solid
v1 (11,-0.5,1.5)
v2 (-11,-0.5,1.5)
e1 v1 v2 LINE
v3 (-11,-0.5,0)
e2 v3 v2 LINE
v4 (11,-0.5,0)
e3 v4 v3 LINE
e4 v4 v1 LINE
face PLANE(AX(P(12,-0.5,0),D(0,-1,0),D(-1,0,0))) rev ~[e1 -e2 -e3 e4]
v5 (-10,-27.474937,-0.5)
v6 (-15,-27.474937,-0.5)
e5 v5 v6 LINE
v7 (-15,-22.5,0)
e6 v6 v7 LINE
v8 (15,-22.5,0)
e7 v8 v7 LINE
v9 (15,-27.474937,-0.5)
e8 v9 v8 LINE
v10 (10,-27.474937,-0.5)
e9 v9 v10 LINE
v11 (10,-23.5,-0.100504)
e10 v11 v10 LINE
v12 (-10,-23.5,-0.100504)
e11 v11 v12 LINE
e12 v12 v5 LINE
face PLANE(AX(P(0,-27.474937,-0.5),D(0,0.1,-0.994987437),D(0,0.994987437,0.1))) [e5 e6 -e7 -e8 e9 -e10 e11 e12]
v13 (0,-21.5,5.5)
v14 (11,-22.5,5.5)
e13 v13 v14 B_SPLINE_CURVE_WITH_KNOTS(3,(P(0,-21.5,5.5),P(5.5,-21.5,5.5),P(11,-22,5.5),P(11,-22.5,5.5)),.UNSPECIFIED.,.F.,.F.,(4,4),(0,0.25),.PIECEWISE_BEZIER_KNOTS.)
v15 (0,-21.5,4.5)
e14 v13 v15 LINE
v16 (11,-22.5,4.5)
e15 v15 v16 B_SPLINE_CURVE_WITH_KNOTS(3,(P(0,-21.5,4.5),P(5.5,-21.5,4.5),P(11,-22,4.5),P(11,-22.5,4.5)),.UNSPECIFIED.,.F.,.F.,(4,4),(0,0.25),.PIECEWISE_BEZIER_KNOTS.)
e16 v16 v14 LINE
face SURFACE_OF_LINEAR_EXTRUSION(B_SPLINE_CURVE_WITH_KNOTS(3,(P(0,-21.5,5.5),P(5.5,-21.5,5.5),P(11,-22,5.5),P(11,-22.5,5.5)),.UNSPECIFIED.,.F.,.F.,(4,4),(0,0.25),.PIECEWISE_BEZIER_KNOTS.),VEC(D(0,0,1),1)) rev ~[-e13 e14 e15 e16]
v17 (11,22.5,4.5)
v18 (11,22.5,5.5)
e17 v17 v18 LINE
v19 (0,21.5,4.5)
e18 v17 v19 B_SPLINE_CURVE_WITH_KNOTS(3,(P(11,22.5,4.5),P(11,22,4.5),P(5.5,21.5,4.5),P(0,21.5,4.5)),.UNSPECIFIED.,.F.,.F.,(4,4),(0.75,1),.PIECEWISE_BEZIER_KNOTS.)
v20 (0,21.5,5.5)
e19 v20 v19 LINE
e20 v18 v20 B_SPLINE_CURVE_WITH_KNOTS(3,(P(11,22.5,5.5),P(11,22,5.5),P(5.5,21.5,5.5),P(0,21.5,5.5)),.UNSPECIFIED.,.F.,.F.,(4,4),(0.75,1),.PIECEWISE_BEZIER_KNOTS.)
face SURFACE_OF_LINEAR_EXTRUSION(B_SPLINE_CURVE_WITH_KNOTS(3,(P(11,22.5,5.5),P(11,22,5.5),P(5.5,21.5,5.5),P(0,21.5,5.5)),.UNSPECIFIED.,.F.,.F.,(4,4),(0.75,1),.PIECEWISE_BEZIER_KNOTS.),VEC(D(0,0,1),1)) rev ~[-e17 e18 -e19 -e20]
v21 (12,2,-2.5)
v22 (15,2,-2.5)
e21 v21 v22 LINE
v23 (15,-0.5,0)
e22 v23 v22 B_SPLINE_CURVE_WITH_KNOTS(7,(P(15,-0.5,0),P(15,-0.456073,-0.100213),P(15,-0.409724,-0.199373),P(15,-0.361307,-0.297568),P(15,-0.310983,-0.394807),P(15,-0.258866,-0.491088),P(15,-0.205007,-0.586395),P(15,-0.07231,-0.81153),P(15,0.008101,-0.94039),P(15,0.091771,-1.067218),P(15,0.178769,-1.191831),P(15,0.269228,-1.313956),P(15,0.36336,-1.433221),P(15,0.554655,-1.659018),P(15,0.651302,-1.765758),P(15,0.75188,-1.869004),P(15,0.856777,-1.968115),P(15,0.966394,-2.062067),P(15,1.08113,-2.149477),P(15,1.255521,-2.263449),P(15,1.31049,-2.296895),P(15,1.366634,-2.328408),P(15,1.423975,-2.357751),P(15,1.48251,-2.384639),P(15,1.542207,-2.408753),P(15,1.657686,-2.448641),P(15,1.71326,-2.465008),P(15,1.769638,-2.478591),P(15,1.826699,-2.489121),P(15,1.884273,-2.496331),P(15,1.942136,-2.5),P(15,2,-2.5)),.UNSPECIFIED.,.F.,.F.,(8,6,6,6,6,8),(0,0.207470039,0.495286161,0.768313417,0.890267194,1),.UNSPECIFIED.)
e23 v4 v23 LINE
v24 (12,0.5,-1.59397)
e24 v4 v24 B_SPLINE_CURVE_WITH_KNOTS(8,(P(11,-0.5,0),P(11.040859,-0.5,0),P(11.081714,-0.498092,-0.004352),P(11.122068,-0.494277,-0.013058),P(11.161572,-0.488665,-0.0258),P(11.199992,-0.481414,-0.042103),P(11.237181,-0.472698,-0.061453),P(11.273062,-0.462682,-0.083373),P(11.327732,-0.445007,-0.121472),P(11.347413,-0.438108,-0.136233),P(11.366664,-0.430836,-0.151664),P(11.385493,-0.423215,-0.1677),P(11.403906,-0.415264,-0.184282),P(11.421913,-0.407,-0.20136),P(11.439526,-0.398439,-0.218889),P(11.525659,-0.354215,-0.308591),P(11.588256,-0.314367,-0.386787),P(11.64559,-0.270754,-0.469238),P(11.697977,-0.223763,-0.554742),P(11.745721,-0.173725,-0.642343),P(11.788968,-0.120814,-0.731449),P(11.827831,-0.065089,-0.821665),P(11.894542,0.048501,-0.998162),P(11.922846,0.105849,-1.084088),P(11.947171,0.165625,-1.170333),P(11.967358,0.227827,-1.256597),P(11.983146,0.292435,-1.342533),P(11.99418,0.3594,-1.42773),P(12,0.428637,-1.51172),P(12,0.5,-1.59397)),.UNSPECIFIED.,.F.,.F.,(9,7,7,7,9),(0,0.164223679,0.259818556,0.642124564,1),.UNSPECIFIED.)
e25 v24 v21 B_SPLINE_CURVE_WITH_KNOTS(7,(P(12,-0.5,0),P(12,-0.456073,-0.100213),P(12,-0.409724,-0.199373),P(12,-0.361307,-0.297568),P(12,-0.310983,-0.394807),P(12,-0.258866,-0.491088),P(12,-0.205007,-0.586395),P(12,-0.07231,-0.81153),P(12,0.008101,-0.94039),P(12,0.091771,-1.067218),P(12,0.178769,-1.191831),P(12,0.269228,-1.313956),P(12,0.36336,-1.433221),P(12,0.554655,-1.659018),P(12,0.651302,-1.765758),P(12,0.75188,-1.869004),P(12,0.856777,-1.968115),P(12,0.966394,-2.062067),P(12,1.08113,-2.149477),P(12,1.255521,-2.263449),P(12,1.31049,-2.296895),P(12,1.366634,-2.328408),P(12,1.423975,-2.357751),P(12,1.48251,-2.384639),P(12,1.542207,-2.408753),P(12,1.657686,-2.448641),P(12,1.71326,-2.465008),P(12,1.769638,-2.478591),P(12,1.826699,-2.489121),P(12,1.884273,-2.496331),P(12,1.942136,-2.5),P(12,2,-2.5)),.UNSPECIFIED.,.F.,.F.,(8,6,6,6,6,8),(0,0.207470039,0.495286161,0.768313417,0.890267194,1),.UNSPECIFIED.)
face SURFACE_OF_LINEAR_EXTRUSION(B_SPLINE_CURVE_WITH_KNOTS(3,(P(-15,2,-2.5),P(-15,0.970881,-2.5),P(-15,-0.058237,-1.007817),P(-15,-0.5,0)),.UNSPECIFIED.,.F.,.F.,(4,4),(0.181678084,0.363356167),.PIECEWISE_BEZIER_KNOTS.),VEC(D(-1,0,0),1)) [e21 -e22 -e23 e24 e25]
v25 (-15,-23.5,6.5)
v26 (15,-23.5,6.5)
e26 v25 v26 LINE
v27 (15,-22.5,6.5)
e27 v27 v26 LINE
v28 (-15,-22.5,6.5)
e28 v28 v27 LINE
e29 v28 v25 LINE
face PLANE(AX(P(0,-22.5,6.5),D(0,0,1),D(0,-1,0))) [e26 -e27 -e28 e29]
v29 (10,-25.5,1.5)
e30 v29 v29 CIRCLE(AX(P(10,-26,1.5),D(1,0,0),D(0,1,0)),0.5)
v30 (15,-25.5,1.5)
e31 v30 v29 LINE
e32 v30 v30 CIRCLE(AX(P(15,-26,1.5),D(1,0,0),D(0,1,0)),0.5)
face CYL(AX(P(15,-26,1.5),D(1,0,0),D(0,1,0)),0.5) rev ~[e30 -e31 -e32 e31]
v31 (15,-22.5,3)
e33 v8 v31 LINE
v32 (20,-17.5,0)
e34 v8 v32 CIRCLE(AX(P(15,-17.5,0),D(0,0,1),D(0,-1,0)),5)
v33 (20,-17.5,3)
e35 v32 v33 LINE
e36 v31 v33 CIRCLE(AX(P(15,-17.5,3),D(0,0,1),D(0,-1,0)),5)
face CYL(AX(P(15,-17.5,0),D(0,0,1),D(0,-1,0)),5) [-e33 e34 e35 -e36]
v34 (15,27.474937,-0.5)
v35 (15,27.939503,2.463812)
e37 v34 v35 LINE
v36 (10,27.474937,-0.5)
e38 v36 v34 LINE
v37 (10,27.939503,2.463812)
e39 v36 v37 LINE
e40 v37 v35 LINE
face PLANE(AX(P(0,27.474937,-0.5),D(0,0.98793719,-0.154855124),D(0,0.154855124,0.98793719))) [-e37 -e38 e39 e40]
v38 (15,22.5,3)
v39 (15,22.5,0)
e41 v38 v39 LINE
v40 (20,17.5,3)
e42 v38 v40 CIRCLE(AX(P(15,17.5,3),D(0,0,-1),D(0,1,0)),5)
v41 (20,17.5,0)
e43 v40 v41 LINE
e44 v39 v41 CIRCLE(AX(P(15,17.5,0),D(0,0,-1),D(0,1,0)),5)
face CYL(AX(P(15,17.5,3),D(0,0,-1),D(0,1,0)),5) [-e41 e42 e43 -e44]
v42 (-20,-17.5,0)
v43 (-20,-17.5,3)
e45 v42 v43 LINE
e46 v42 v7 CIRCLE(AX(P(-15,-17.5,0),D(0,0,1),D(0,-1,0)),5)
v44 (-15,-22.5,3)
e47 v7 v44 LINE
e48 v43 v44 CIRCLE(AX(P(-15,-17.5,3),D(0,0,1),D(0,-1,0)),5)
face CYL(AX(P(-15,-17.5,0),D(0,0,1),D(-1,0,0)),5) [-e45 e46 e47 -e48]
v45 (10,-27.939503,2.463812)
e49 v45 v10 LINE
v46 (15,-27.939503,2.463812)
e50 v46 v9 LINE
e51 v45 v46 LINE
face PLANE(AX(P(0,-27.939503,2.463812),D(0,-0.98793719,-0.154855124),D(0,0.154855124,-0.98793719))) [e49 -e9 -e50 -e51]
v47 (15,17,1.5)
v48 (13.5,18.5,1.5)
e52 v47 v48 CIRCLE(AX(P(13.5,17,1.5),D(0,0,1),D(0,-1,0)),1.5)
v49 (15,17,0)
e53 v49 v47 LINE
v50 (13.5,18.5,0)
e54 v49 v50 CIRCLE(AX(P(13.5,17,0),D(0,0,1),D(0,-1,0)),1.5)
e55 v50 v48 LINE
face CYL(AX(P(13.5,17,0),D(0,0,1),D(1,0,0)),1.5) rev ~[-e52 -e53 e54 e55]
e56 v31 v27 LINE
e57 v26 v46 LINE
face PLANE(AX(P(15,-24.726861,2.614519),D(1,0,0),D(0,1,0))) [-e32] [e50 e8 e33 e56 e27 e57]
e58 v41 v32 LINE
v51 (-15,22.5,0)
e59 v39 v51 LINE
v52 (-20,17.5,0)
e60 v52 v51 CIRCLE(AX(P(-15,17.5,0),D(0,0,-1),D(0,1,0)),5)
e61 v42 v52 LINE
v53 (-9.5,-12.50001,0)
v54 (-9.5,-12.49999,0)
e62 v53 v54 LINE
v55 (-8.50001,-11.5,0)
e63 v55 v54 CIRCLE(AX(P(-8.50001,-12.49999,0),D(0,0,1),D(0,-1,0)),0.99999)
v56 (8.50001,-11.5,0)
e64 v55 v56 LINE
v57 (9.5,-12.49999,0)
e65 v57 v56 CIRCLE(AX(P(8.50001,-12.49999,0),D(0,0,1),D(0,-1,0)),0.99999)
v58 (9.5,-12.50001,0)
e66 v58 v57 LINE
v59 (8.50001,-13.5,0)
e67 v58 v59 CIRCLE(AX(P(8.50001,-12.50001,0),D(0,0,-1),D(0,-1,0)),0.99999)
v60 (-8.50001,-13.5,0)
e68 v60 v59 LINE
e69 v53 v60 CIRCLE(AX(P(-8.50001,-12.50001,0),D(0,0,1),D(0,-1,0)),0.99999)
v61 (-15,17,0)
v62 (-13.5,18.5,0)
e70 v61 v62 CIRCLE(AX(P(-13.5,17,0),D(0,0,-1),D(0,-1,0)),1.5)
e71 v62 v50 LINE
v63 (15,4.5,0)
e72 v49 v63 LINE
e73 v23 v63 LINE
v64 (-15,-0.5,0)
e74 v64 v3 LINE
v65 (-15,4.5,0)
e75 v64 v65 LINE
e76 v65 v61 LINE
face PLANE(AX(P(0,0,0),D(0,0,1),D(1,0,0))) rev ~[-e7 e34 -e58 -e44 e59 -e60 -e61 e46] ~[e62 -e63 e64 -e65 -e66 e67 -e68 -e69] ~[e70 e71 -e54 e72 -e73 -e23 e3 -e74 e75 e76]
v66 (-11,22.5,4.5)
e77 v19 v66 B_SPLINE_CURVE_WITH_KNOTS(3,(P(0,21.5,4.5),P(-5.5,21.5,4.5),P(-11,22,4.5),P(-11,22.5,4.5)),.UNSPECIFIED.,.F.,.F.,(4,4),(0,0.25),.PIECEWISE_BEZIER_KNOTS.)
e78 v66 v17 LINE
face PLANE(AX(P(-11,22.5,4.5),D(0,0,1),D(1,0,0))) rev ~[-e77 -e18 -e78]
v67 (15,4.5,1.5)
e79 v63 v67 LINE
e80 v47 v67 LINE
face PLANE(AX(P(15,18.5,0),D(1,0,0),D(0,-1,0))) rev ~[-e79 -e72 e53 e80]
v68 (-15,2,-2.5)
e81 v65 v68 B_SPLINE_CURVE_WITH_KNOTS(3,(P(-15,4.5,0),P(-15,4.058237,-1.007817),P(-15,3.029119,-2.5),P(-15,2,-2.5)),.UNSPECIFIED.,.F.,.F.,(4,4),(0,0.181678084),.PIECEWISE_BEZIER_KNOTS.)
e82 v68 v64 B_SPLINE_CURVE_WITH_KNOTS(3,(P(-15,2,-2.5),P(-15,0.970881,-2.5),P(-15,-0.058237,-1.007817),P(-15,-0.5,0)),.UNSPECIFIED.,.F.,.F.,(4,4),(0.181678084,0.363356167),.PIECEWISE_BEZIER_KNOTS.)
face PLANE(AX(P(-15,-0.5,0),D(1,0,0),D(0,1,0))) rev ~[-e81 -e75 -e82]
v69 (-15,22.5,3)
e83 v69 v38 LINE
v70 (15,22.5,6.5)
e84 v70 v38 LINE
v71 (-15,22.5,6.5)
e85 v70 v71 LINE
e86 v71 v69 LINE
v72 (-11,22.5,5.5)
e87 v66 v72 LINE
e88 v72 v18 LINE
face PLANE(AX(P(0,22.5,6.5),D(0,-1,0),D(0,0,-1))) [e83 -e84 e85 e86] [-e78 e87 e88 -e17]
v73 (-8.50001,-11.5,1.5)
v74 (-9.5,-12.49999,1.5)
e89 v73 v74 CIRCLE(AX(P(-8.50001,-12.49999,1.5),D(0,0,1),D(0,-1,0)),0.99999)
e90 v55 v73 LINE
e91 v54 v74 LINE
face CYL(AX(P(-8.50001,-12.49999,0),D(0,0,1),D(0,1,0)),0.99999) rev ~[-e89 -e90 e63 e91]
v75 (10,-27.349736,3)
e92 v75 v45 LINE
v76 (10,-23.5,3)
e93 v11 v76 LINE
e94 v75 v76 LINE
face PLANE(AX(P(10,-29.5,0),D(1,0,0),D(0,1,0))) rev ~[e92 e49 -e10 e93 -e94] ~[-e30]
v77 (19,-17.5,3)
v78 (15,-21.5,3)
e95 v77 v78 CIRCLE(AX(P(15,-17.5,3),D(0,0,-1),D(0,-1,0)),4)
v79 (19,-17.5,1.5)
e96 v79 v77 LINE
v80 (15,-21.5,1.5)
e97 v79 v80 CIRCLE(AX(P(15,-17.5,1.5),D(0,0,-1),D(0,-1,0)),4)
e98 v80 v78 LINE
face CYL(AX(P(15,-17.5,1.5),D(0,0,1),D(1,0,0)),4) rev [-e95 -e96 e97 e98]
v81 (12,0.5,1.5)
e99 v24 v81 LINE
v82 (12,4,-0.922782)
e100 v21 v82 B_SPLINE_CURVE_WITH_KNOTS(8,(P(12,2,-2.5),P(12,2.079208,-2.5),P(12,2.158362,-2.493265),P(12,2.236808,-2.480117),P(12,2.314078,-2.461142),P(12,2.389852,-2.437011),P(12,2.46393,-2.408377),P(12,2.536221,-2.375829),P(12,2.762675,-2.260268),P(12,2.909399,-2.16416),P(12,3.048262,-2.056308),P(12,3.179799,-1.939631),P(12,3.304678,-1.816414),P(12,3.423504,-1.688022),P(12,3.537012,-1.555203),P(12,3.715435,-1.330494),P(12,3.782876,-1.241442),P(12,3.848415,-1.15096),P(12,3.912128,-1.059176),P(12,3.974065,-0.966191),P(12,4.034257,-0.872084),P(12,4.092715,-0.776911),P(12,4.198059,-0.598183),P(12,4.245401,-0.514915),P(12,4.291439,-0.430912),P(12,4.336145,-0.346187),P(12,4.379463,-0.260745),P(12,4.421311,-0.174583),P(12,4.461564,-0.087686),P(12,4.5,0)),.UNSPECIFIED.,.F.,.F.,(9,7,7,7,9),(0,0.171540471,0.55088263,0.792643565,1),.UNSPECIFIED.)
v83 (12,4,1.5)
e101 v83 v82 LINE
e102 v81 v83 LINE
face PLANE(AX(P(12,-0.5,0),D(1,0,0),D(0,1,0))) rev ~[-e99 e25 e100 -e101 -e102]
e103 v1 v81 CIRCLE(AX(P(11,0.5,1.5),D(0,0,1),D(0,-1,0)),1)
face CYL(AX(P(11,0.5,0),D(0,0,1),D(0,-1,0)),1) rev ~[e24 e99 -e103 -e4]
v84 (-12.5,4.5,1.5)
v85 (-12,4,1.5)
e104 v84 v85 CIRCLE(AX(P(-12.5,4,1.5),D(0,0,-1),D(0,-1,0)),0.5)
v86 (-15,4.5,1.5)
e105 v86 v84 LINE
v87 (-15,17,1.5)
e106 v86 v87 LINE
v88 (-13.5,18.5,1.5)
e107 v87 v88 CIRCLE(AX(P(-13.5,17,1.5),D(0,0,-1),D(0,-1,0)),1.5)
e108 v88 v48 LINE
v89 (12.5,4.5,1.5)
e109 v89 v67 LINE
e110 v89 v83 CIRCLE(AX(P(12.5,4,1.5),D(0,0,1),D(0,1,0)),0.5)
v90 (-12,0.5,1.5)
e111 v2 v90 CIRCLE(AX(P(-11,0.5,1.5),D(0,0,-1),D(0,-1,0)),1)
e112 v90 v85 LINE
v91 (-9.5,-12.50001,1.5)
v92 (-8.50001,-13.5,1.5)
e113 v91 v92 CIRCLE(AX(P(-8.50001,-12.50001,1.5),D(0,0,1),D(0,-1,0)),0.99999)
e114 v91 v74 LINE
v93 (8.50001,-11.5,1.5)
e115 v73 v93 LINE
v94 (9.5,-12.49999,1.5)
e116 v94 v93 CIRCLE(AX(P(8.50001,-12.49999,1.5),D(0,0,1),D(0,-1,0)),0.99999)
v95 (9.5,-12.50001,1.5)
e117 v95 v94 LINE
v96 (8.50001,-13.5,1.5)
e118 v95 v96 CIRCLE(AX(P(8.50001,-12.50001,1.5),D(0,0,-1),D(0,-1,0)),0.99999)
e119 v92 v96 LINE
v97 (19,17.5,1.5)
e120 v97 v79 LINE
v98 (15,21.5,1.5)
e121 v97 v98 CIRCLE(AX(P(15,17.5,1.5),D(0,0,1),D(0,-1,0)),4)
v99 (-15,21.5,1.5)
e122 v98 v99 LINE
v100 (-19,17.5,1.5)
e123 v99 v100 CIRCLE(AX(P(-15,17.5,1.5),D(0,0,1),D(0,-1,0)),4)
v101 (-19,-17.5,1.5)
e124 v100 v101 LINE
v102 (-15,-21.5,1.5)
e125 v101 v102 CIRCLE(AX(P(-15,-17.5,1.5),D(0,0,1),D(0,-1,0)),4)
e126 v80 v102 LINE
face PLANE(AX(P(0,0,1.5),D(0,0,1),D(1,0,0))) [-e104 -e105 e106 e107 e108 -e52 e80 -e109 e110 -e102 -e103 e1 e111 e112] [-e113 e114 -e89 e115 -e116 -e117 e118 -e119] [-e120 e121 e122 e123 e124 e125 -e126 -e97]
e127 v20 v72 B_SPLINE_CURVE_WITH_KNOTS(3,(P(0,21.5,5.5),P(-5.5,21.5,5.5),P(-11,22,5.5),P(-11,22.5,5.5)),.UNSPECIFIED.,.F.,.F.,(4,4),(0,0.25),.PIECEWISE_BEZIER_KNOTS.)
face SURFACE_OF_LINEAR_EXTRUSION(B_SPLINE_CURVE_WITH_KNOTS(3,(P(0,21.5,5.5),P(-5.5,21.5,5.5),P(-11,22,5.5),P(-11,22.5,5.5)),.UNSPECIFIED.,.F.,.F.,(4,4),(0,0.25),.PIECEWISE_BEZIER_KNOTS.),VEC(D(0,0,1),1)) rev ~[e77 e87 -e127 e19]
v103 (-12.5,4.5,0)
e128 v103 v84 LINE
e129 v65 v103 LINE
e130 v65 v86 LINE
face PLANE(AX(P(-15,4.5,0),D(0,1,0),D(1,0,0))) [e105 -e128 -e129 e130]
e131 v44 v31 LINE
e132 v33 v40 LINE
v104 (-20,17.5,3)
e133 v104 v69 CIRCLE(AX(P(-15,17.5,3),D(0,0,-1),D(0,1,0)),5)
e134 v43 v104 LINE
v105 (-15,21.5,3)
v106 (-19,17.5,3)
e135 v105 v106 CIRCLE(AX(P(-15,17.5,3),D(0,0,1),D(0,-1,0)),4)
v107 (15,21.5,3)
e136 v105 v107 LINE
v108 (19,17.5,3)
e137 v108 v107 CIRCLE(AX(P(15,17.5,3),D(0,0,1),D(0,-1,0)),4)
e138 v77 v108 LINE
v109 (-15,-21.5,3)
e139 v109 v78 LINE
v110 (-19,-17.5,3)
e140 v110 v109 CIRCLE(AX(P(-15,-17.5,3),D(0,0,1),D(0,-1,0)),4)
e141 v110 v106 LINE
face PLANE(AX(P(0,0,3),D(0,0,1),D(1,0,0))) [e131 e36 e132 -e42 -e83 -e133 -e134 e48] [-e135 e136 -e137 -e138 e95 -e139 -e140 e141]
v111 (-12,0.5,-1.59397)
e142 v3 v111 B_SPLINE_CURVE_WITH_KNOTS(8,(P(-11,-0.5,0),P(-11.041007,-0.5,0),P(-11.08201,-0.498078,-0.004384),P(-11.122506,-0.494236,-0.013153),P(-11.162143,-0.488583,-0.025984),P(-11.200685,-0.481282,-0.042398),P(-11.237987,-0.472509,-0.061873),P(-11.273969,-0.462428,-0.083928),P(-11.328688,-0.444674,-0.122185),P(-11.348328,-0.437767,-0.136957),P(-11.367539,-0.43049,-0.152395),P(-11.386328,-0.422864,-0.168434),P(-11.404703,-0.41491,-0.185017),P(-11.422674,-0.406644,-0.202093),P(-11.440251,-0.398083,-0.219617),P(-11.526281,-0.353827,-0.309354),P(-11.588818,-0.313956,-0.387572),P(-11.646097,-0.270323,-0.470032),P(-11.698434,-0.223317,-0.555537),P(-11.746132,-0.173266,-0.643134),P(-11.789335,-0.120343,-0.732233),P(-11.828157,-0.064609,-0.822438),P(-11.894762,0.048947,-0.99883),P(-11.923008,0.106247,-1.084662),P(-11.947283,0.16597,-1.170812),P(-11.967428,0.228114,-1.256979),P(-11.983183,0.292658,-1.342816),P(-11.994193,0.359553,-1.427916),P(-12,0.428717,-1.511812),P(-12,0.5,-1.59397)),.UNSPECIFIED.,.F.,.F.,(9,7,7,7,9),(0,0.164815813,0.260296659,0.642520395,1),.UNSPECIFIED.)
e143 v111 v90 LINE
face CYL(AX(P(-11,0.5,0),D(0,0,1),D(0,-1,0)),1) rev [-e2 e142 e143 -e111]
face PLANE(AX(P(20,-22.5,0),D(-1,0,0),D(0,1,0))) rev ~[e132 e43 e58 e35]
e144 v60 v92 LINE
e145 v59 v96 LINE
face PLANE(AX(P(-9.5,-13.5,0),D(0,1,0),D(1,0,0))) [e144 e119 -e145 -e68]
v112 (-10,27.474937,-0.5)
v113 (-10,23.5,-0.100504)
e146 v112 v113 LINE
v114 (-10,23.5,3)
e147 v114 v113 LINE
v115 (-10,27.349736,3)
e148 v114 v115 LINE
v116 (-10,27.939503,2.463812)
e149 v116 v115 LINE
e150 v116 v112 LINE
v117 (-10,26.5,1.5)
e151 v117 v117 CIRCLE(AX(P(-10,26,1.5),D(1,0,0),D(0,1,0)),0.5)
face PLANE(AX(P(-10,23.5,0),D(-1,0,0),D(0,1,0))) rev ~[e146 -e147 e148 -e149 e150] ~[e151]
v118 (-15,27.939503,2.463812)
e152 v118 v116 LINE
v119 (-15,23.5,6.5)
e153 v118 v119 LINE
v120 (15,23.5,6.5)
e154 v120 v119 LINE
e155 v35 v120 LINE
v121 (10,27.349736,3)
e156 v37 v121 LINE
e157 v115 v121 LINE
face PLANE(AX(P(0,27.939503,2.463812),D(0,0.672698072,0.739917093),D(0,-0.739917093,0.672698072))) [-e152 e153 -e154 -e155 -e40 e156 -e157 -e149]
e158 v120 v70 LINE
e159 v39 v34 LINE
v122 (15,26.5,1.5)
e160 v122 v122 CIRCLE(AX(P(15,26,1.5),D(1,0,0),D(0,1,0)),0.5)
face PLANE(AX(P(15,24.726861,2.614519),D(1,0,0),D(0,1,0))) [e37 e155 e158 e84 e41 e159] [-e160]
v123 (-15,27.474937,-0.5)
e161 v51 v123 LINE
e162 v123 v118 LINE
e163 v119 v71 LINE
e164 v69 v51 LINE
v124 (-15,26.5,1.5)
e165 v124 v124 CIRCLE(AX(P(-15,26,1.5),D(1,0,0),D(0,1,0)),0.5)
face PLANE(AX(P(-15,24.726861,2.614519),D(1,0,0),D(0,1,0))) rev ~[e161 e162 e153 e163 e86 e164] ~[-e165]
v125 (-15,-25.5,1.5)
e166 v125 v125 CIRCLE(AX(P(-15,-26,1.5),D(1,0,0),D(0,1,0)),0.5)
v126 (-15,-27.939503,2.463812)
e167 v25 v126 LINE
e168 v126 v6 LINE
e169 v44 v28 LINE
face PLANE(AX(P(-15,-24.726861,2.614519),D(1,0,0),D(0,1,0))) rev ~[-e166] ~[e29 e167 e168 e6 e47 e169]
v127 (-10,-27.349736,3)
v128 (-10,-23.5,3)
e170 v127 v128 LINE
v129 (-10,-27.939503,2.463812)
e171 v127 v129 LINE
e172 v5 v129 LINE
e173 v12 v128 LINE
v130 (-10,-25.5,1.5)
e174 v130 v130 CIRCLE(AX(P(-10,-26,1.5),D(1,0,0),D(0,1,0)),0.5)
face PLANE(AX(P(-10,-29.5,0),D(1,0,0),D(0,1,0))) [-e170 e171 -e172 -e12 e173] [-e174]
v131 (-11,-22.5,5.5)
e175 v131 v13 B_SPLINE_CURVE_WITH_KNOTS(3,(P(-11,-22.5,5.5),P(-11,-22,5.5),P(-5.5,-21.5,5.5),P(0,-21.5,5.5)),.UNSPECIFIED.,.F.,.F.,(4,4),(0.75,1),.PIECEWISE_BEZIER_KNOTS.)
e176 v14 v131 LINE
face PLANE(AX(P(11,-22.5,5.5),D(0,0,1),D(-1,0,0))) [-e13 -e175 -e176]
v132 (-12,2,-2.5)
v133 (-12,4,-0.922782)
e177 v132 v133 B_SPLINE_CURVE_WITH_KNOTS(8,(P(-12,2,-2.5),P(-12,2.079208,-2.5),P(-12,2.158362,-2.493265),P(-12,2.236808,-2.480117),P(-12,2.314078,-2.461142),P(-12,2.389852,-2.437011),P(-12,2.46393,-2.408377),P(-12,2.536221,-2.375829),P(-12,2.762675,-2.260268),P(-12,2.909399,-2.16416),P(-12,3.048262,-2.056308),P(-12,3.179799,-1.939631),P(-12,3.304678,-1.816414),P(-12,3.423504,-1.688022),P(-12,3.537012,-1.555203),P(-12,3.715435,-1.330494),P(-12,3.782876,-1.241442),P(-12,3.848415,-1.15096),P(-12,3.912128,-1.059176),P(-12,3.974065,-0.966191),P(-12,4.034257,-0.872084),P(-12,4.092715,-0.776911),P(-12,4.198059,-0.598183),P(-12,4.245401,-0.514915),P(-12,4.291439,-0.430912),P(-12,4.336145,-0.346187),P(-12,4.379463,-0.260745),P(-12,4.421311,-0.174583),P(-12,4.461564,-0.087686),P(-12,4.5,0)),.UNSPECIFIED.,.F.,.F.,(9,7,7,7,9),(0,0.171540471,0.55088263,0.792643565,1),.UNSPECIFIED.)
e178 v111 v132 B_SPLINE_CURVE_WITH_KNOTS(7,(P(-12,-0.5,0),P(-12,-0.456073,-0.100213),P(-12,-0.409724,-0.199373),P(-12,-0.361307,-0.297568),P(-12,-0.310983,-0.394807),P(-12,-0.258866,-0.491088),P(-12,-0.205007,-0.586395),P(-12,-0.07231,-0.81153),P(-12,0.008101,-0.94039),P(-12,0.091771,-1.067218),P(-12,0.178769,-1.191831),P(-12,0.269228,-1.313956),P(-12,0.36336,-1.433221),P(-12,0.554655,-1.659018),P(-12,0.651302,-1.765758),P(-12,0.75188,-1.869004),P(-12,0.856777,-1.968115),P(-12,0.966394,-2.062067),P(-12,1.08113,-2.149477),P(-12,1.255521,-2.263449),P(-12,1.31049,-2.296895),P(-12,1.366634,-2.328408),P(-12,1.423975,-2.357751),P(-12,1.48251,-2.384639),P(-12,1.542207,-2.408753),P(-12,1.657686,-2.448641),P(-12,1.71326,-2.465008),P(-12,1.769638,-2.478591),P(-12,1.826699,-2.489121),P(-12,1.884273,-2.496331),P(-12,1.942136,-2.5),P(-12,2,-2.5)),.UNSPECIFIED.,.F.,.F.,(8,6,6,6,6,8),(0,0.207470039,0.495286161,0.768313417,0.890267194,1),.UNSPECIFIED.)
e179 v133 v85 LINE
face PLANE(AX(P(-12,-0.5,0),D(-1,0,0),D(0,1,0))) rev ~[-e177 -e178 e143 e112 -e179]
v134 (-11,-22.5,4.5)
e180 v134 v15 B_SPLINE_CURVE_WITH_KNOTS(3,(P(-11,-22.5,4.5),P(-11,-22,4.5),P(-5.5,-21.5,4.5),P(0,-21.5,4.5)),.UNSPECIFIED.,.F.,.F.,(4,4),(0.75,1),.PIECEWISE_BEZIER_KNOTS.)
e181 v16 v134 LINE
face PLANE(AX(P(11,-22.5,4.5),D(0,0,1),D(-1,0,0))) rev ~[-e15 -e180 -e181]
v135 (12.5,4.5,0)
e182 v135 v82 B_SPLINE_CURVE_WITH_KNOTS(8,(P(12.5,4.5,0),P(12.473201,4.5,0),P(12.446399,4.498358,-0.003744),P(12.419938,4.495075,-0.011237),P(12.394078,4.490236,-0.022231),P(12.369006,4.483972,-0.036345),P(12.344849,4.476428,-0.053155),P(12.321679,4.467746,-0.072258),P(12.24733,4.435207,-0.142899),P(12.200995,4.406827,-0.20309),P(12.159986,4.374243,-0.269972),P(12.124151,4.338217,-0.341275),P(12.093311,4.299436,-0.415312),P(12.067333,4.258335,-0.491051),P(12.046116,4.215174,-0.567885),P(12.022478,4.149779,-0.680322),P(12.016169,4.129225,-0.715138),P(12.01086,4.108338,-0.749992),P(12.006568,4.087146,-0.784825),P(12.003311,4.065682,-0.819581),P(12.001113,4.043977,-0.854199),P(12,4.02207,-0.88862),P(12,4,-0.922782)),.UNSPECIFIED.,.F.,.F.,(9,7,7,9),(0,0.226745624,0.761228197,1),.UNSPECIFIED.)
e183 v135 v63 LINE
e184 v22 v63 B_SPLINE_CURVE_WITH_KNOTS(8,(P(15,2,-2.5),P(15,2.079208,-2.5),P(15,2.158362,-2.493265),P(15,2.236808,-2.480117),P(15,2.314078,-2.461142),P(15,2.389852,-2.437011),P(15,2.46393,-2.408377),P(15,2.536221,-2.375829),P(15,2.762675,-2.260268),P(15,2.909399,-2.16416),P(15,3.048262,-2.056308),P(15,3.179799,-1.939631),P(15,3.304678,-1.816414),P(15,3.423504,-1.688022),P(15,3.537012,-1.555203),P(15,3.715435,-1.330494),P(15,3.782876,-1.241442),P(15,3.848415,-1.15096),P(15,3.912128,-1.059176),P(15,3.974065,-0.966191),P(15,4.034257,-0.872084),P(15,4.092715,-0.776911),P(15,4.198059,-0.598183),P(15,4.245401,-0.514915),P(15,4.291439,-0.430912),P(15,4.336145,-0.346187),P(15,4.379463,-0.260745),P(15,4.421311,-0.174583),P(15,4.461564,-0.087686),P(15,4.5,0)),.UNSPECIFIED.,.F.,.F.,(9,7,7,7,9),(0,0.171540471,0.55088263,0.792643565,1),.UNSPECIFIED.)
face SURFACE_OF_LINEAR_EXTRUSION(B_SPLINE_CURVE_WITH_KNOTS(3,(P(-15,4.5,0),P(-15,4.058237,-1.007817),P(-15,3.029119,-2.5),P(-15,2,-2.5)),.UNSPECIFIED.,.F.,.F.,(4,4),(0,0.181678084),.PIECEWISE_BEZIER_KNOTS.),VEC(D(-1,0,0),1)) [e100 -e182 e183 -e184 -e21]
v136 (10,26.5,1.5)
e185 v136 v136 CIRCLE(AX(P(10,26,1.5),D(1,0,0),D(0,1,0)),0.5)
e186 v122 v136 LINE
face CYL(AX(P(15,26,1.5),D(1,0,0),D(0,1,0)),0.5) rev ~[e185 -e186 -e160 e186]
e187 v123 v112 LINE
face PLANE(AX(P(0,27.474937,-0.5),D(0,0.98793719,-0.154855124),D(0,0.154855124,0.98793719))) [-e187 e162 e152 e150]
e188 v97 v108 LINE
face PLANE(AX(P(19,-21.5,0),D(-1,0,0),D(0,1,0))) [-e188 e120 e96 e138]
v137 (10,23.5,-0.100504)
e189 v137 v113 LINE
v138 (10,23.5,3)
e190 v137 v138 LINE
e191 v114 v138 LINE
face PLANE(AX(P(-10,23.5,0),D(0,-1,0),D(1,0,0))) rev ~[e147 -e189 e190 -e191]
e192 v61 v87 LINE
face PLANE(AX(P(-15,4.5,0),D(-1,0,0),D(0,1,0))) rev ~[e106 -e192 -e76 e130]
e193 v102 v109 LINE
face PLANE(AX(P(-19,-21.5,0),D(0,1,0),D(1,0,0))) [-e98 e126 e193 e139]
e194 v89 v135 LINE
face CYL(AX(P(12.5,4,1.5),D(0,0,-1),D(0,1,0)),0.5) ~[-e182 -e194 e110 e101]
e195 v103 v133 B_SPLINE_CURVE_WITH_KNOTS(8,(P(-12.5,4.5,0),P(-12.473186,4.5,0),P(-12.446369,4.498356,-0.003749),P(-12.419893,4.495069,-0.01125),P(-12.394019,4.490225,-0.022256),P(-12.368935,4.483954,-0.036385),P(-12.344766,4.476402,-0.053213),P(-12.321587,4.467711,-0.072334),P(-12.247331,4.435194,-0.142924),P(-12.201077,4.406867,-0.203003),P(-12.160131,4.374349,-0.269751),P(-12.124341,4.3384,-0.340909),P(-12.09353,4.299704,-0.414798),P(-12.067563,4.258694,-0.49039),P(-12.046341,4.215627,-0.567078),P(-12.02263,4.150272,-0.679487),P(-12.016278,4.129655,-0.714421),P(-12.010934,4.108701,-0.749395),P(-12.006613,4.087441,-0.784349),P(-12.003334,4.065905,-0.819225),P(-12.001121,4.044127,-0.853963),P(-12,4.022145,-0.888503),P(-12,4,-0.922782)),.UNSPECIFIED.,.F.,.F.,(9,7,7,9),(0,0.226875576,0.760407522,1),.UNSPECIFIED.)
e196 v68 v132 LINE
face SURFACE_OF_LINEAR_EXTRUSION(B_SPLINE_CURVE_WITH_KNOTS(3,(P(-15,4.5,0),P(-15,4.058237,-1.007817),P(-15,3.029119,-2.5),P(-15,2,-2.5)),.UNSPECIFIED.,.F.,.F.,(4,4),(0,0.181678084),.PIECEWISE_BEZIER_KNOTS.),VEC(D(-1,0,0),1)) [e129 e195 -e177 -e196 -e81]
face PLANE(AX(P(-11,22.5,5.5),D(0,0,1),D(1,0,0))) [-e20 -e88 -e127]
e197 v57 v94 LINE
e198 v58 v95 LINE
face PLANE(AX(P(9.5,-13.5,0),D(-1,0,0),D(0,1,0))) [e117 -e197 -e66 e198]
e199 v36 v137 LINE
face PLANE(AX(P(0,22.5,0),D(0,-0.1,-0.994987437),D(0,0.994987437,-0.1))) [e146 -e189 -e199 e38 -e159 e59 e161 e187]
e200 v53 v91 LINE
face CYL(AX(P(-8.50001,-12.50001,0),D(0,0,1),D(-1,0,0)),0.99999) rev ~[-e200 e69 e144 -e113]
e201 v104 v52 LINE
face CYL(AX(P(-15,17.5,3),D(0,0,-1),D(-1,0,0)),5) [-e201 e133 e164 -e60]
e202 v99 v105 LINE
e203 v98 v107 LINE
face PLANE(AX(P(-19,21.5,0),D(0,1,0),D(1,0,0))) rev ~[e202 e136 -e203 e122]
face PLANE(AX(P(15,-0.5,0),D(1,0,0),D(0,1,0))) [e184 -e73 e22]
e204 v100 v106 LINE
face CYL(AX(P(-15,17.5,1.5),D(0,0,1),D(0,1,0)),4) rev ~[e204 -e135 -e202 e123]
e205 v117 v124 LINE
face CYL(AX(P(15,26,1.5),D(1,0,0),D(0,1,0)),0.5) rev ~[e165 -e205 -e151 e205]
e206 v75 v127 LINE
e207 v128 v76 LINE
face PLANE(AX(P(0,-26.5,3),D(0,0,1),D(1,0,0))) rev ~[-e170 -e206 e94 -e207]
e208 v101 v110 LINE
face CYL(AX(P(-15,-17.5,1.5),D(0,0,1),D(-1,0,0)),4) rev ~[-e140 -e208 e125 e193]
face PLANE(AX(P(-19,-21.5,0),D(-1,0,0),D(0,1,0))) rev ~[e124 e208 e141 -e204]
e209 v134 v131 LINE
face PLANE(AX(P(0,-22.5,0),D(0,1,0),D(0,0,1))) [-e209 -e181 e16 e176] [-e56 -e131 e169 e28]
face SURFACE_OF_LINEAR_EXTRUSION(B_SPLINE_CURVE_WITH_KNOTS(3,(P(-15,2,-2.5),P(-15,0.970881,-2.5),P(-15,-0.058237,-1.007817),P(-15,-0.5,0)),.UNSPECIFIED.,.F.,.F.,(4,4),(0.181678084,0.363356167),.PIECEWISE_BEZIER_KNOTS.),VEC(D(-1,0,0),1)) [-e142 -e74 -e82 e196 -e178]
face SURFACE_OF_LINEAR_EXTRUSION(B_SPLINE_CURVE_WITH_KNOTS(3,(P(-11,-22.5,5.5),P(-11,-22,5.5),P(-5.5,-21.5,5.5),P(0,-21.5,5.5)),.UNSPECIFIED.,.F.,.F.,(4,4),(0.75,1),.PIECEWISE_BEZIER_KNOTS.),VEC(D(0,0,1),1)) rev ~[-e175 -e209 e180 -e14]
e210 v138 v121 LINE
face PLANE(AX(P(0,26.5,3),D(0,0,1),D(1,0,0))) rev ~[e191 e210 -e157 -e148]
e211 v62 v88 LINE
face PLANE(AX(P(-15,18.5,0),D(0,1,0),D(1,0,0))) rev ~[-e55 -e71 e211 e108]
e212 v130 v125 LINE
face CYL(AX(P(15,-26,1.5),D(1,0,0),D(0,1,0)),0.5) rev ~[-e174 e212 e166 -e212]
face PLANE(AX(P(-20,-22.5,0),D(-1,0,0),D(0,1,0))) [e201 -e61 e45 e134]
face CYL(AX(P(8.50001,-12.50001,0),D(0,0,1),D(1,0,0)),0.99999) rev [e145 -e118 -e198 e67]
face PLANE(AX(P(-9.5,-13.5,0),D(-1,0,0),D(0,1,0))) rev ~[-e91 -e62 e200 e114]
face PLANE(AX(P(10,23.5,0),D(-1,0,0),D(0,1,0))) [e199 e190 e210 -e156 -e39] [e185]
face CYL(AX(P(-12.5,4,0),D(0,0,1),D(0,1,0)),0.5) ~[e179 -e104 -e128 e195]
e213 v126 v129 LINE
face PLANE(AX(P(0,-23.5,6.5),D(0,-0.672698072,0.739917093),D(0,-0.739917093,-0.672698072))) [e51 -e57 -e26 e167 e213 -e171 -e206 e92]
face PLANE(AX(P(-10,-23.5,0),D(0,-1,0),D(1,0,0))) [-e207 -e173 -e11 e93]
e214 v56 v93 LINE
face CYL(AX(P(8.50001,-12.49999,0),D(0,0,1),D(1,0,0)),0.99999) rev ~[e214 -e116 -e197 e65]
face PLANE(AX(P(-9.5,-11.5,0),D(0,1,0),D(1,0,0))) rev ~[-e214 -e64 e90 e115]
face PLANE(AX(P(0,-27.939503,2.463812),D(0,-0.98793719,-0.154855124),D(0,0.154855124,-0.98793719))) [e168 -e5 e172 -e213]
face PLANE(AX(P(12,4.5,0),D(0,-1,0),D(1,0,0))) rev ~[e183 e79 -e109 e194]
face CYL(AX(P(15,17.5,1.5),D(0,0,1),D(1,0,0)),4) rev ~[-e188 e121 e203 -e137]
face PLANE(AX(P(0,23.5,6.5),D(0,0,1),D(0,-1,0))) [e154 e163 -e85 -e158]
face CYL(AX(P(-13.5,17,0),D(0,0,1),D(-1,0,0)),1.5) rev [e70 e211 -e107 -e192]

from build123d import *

# Parameters (mm, degrees)
F0_W           = 40
F0_H           = 45
F0_W_2         = 19
F0_H_2         = 2
F0_W_3         = 3
F0_H_3         = 5
F1_DEPTH       = 1.5
F2_DEPTH       = 2.5
F4_DEPTH       = 50
F5_R           = 0.99999
F6_R           = 1.5
F7_R           = 1
F8_R           = 0.5
F9_W           = 40
F9_H           = 45
F9_W_2         = 38
F9_H_2         = 43
F10_DEPTH      = 3
F11_R          = 4
F12_R          = 5
F14_DEPTH      = 15
F14_DEPTH_BACK = 15
F15_W          = 22
F15_H          = 1
F16_DEPTH      = 1
F18_DEPTH      = 1
F19_W          = 22
F19_H          = 1
F20_DEPTH      = 1
F22_DEPTH      = 1
F23_R          = 0.5
F24_DEPTH      = 30
F25_R          = 0.5
F26_DEPTH      = 30
F27_W          = 20
F27_H          = 6
F28_DEPTH      = 3
F28_DEPTH_BACK = 2


# Not quite as in the source:
# - a fillet or chamfer is up to 0.001 mm smaller than in the source, because OpenCascade refuses the exact size


with BuildPart() as f1:
    # F0 (on Top) → F1 (new body)
    with BuildSketch(Plane.XY):
        Rectangle(F0_W, F0_H)
        with Locations((0, -12.5)):
            Rectangle(F0_W_2, F0_H_2, mode=Mode.SUBTRACT)
        Polygon((-15, -0.5), (-15, 4.5), (-15, 18.5), (15, 18.5), (15, 4.5), (15, -0.5), (12, -0.5), (-12, -0.5), align=None, mode=Mode.SUBTRACT)
        with Locations((-13.5, 2)):
            Rectangle(F0_W_3, F0_H_3)
        with Locations((13.5, 2)):
            Rectangle(F0_W_3, F0_H_3)
    extrude(amount=F1_DEPTH)

    # F0 (on Top) → F2 (join)
    with BuildSketch(Plane.XY):
        with Locations((13.5, 2)):
            Rectangle(F0_W_3, F0_H_3)
        with Locations((-13.5, 2)):
            Rectangle(F0_W_3, F0_H_3)
    extrude(amount=-F2_DEPTH)

    # F3 (on face) → F4 (cut)
    with BuildSketch(Plane(origin=(-15, 0, 0), x_dir=(0, -1, 0), z_dir=(-1, 0, 0))):
        with BuildLine():
            add(Edge.make_bspline(
                [(-4.5, 0), (-4.0582373844, -1.0078166901), (-3.0291186922, -2.5), (-2, -2.5)],
                knots=[0, 0, 0, 0, 0.1816780837, 0.1816780837, 0.1816780837, 0.1816780837], degree=3))
            Line((-4.5, 0), (-4.5, -2.5))
            Line((-4.5, -2.5), (-2, -2.5))
        make_face()
        with BuildLine():
            Line((0.5, -2.5), (0.5, 0))
            add(Edge.make_bspline(
                [(-2, -2.5), (-0.9708813078, -2.5), (0.0582373844, -1.0078166901), (0.5, 0)],
                knots=[0.1816780837, 0.1816780837, 0.1816780837, 0.1816780837, 0.3633561673, 0.3633561673, 0.3633561673, 0.3633561673], degree=3))
            Line((-2, -2.5), (0.5, -2.5))
        make_face()
    extrude(amount=-F4_DEPTH, mode=Mode.SUBTRACT)

    # F5 (radius 1 in the source; OpenCascade refuses exactly that, so slightly less here)
    f5_edges = [f1.edges().sort_by_distance(p)[0] for p in [
        (9.5, -11.5, 0.75),
        (9.5, -13.5, 0.75),
        (-9.5, -11.5, 0.75),
        (-9.5, -13.5, 0.75),
    ]]
    fillet(f5_edges, radius=F5_R)

    # F6
    f6_edges = [f1.edges().sort_by_distance(p)[0] for p in [
        (-15, 18.5, 0.75),
        (15, 18.5, 0.75),
    ]]
    fillet(f6_edges, radius=F6_R)

    # F7
    f7_edges = [f1.edges().sort_by_distance(p)[0] for p in [
        (12, -0.5, 0.75),
        (-12, -0.5, 0.75),
    ]]
    fillet(f7_edges, radius=F7_R)

    # F8
    f8_edges = [f1.edges().sort_by_distance(p)[0] for p in [
        (12, 4.5, 0.75),
        (-12, 4.5, 0.75),
    ]]
    fillet(f8_edges, radius=F8_R)

    # F9 (on Top) → F10 (join)
    with BuildSketch(Plane.XY):
        Rectangle(F9_W, F9_H)
        Rectangle(F9_W_2, F9_H_2, mode=Mode.SUBTRACT)
    extrude(amount=F10_DEPTH)

    # F11
    f11_edges = [f1.edges().sort_by_distance(p)[0] for p in [
        (-19, 21.5, 2.25),
        (19, 21.5, 2.25),
        (19, -21.5, 2.25),
        (-19, -21.5, 2.25),
    ]]
    fillet(f11_edges, radius=F11_R)

    # F12
    f12_edges = [f1.edges().sort_by_distance(p)[0] for p in [
        (-20, -22.5, 1.5),
        (20, -22.5, 1.5),
        (20, 22.5, 1.5),
        (-20, 22.5, 1.5),
    ]]
    fillet(f12_edges, radius=F12_R)

    # F13 (on Right) → F14 (join, two sides)
    with BuildSketch(Plane.YZ) as f14_sk:
        Polygon((22.5, 6.5), (22.5, 0), (27.4749371855, -0.5), (27.9395025565, 2.4638115689), (23.5, 6.5), align=None)
        Polygon((-27.4749371855, -0.5), (-22.5, 0), (-22.5, 6.5), (-23.5, 6.5), (-27.9395025565, 2.4638115689), align=None)
    extrude(amount=F14_DEPTH)
    extrude(f14_sk.sketch, amount=-F14_DEPTH_BACK)

    # F15 (on face) → F16 (join)
    with BuildSketch(Plane.XZ.offset(-22.5)):
        with Locations((0, 5)):
            Rectangle(F15_W, F15_H)
    extrude(amount=F16_DEPTH)

    # F17 (on face) → F18 (cut)
    with BuildSketch(Plane.XY.offset(5.5)):
        with BuildLine():
            Line((-11, 21.5), (0, 21.5))
            add(Edge.make_bspline(
                [(0, 21.5), (-5.5, 21.5), (-11, 22), (-11, 22.5)],
                knots=[0, 0, 0, 0, 0.25, 0.25, 0.25, 0.25], degree=3))
            Line((-11, 22.5), (-11, 21.5))
        make_face()
        with BuildLine():
            add(Edge.make_bspline(
                [(11, 22.5), (11, 22), (5.5, 21.5), (0, 21.5)],
                knots=[0.75, 0.75, 0.75, 0.75, 1, 1, 1, 1], degree=3))
            Line((0, 21.5), (11, 21.5))
            Line((11, 21.5), (11, 22.5))
        make_face()
    extrude(amount=-F18_DEPTH, mode=Mode.SUBTRACT)

    # F19 (on face) → F20 (join)
    with BuildSketch(Plane(origin=(0, -22.5, 0), x_dir=(-1, 0, 0), z_dir=(0, 1, 0))):
        with Locations((0, 5)):
            Rectangle(F19_W, F19_H)
    extrude(amount=F20_DEPTH)

    # F21 (on face) → F22 (cut)
    with BuildSketch(Plane.XY.offset(5.5)):
        with BuildLine():
            Line((11, -21.5), (0, -21.5))
            add(Edge.make_bspline(
                [(0, -21.5), (5.5, -21.5), (11, -22), (11, -22.5)],
                knots=[0, 0, 0, 0, 0.25, 0.25, 0.25, 0.25], degree=3))
            Line((11, -22.5), (11, -21.5))
        make_face()
        with BuildLine():
            add(Edge.make_bspline(
                [(-11, -22.5), (-11, -22), (-5.5, -21.5), (0, -21.5)],
                knots=[0.75, 0.75, 0.75, 0.75, 1, 1, 1, 1], degree=3))
            Line((0, -21.5), (-11, -21.5))
            Line((-11, -21.5), (-11, -22.5))
        make_face()
    extrude(amount=-F22_DEPTH, mode=Mode.SUBTRACT)

    # F23 (on face) → F24 (cut)
    with BuildSketch(Plane.YZ.offset(15)):
        with Locations((26, 1.5)):
            Circle(F23_R)
    extrude(amount=-F24_DEPTH, mode=Mode.SUBTRACT)

    # F25 (on face) → F26 (cut)
    with BuildSketch(Plane.YZ.offset(15)):
        with Locations((-26, 1.5)):
            Circle(F25_R)
    extrude(amount=-F26_DEPTH, mode=Mode.SUBTRACT)

    # F27 (on Top) → F28 (cut, two sides)
    with BuildSketch(Plane.XY) as f28_sk:
        with Locations((0, 26.5)):
            Rectangle(F27_W, F27_H)
        with Locations((0, -26.5)):
            Rectangle(F27_W, F27_H)
    extrude(amount=F28_DEPTH, mode=Mode.SUBTRACT)
    extrude(f28_sk.sketch, amount=-F28_DEPTH_BACK, mode=Mode.SUBTRACT)


solid = f1.part
